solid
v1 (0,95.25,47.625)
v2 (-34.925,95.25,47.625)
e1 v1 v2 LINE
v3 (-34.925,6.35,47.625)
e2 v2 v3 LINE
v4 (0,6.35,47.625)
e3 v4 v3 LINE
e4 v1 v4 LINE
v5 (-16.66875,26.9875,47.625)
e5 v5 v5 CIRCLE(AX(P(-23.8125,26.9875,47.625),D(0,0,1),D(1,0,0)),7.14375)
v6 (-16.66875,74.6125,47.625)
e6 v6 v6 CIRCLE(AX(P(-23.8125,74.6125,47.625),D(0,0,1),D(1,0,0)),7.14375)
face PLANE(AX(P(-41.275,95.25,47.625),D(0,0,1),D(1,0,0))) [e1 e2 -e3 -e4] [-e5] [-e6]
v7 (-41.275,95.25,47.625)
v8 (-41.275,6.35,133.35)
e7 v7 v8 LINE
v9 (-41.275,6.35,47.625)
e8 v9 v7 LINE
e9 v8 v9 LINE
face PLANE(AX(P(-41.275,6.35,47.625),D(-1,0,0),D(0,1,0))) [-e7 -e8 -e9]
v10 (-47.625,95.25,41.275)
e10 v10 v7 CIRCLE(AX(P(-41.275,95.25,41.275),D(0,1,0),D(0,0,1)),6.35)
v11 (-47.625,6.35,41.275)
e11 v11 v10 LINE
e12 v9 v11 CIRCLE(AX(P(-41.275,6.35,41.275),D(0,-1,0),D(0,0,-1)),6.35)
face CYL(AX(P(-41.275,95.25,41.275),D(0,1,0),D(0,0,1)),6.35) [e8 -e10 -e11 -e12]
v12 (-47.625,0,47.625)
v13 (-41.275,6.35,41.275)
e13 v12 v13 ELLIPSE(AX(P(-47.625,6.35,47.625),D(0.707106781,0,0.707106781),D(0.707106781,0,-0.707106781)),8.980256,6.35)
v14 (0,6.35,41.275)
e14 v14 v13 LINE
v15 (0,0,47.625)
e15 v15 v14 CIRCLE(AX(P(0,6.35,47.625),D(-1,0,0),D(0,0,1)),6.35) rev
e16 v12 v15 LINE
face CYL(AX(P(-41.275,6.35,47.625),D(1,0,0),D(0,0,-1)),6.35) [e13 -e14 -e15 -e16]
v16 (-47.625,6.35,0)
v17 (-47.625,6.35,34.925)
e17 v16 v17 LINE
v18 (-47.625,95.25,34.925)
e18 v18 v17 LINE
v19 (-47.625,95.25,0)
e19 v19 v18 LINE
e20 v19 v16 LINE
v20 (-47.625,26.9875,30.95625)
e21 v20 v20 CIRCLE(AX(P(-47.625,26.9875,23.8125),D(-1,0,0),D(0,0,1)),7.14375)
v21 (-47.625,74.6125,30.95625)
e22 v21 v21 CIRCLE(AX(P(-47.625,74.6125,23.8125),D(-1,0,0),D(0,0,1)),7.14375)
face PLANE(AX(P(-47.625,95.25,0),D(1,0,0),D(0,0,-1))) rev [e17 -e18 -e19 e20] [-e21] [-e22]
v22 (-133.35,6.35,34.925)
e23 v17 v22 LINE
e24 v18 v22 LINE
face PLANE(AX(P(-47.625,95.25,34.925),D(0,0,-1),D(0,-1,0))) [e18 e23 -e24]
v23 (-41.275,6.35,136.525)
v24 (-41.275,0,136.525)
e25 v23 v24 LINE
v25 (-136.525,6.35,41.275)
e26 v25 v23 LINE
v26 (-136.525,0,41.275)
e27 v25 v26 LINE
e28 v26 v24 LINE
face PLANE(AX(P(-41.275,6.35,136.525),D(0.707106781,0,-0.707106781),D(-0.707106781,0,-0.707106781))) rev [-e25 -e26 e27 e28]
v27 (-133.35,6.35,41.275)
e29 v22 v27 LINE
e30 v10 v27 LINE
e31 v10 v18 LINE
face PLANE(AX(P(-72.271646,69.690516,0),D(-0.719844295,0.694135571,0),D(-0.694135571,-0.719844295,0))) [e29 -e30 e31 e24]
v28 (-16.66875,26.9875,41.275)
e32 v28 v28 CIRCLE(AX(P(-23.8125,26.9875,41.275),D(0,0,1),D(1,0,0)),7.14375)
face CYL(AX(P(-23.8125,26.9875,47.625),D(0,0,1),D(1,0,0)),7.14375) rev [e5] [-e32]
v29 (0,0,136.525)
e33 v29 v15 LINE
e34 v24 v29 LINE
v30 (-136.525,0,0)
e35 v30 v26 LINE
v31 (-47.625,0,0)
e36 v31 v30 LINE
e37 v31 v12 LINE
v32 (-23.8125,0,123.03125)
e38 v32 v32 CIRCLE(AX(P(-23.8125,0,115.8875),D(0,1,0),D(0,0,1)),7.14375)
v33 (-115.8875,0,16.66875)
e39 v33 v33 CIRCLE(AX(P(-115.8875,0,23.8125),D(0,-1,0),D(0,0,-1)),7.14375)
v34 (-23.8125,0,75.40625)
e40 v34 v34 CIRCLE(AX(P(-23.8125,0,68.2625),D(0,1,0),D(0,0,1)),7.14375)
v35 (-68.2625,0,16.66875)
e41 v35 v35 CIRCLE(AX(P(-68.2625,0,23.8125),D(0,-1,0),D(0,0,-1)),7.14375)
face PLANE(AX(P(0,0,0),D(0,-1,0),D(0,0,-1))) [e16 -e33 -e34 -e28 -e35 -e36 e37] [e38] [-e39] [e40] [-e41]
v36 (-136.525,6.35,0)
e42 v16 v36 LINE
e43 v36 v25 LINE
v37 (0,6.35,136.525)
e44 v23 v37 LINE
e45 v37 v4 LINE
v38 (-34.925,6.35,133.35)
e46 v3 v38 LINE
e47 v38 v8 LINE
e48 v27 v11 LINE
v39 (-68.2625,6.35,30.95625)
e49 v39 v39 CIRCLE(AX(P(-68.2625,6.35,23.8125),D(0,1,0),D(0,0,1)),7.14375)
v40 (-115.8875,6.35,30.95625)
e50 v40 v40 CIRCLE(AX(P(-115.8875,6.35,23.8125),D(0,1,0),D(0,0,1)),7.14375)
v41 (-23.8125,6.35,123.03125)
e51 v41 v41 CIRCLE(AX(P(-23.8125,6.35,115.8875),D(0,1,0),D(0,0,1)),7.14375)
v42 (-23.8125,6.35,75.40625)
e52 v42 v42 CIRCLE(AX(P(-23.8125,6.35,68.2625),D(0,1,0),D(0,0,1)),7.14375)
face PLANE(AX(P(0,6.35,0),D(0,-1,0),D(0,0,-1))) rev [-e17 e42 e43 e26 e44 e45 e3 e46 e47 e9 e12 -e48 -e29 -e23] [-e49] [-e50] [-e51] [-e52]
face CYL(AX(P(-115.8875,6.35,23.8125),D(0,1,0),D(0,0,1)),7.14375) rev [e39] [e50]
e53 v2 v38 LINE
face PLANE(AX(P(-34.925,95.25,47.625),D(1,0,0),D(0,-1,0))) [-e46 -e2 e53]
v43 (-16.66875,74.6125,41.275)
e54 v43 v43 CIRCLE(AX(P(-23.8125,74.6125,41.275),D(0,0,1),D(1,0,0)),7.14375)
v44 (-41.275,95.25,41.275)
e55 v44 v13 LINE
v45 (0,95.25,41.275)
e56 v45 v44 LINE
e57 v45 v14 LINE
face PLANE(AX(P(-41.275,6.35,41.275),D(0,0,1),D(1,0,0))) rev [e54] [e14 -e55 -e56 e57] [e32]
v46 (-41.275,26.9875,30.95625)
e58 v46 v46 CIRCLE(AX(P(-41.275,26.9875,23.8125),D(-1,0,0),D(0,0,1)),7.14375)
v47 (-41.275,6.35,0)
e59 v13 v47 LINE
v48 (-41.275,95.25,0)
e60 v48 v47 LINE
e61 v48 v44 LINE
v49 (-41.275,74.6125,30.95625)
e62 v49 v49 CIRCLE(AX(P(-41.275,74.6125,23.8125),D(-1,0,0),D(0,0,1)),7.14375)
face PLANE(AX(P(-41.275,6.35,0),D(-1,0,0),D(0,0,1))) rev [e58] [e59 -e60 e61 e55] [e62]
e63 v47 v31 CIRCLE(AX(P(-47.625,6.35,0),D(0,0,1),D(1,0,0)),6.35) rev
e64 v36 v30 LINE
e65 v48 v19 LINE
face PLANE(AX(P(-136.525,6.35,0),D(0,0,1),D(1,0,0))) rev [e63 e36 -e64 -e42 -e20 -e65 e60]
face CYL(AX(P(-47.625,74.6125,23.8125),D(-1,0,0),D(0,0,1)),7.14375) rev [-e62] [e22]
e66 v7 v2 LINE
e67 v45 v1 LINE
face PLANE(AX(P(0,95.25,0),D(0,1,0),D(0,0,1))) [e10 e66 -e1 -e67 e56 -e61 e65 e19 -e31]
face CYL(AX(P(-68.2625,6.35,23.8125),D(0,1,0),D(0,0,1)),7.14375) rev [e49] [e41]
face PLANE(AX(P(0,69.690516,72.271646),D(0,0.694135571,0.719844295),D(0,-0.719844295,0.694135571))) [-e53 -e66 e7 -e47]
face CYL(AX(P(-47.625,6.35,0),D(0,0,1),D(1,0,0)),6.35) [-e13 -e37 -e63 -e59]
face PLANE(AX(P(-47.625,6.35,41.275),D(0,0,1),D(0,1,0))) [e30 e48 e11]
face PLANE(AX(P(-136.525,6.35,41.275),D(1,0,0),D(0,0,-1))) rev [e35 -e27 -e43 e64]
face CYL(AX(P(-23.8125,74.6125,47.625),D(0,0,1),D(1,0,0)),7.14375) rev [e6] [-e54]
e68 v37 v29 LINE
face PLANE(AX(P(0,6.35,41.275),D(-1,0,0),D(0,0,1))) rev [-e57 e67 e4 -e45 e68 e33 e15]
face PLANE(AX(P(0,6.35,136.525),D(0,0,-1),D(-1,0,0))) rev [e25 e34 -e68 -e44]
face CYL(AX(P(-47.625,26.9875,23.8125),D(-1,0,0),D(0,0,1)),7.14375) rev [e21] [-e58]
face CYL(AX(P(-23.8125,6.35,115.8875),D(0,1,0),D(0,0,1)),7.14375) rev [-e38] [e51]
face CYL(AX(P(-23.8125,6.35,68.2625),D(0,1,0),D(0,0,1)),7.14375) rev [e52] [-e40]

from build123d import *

# Parameters (mm, degrees)
BASE_PLATE_DEPTH      = 6.35
SKETCH2_W             = 6.35
SKETCH2_H             = 47.625
UPPER_LEAF_DEPTH      = 88.9
LOFT1_START           = 34.925
LOFT1_DEPTH           = 6.35
SKETCH10_W            = 7.14375
SKETCH10_H            = 47.62505
SKETCH10_AT_POINT_2_W = 7.14375
SKETCH10_AT_POINT_2_H = 47.62505
SKETCH10_AT_POINT_3_W = 7.14375
SKETCH10_AT_POINT_3_H = 47.62505
SKETCH10_AT_POINT_4_W = 7.14375
SKETCH10_AT_POINT_4_H = 47.62505
FILLET1_R             = 6.35


# Read off the part's stored shape, not the designer's step: Loft1, Mirror1
with BuildPart() as part:
    # Sketch1 → Base Plate (new body)
    with BuildSketch(Plane(origin=(0, 0, 0), x_dir=(1, 0, 0), z_dir=(0, 1, 0))):
        Polygon((-136.525, 0), (-41.275, 0), (-41.275, -41.275), (0, -41.275), (0, -136.525), (-41.275, -136.525), (-136.525, -41.275), align=None)
    extrude(amount=BASE_PLATE_DEPTH)

    # Sketch2 → Upper Leaf (add)
    with BuildSketch(Plane(origin=(0, 6.35, 0), x_dir=(1, 0, 0), z_dir=(0, 1, 0))):
        with Locations((-44.45, -23.8125)):
            Rectangle(SKETCH2_W, SKETCH2_H)
    extrude(amount=UPPER_LEAF_DEPTH)

    # Loft1 outline → Loft1 (add)
    with BuildSketch(Plane.XY.offset(LOFT1_START)):
        Polygon((-47.625, 6.35), (-47.625, 95.25), (-133.35, 6.35), align=None)
    extrude(amount=LOFT1_DEPTH)

    # Sketch10 → 9/16 (0.5625) Diameter Hole1 (revolve, cut)
    with BuildSketch(Plane(origin=(-47.625, 74.6125, 23.8125), x_dir=(0, 0, 1), z_dir=(0, 1, 0))):
        with Locations((3.571875, 23.812525)):
            Rectangle(SKETCH10_W, SKETCH10_H)
    revolve(axis=Axis((-53.975, 74.6125, 23.8125), (1, 0, 0)), mode=Mode.SUBTRACT)

    # Sketch10 at point 2 (carried to point 2, square into its face) → 9/16 (0.5625) Diameter Hole1 at 2 (revolve, cut)
    with BuildSketch(Plane(origin=(-47.625, 26.9875, 23.8125), x_dir=(0, 0, 1), z_dir=(0, 1, 0))):
        with Locations((3.571875, 23.812525)):
            Rectangle(SKETCH10_AT_POINT_2_W, SKETCH10_AT_POINT_2_H)
    revolve(axis=Axis((-53.975, 26.9875, 23.8125), (1, 0, 0)), mode=Mode.SUBTRACT)

    # Sketch10 at point 3 (carried to point 3, square into its face) → 9/16 (0.5625) Diameter Hole1 at 3 (revolve, cut)
    with BuildSketch(Plane(origin=(-68.2625, 6.35, 23.8125), x_dir=(0, 0, 1), z_dir=(1, 0, 0))):
        with Locations((3.571875, 23.812525)):
            Rectangle(SKETCH10_AT_POINT_3_W, SKETCH10_AT_POINT_3_H)
    revolve(axis=Axis((-68.2625, 12.7, 23.8125), (0, -1, 0)), mode=Mode.SUBTRACT)

    # Sketch10 at point 4 (carried to point 4, square into its face) → 9/16 (0.5625) Diameter Hole1 at 4 (revolve, cut)
    with BuildSketch(Plane(origin=(-115.8875, 6.35, 23.8125), x_dir=(0, 0, 1), z_dir=(1, 0, 0))):
        with Locations((3.571875, 23.812525)):
            Rectangle(SKETCH10_AT_POINT_4_W, SKETCH10_AT_POINT_4_H)
    revolve(axis=Axis((-115.8875, 12.7, 23.8125), (0, -1, 0)), mode=Mode.SUBTRACT)

    # Mirror1
    split(bisect_by=Plane(origin=(0, 0, 0), x_dir=(-0.7071067811865476, 0, 0.7071067811865476), z_dir=(0.7071067811865477, 0, 0.7071067811865475)), keep=Keep.BOTTOM)

    # Mirror1 2: part across plane


with BuildPart() as part_1:
    add(part.part)
    add(part.part.mirror(Plane(origin=(0, 0, 0), x_dir=(-0.7071067811865476, 0, 0.7071067811865476), z_dir=(0.7071067811865477, 0, 0.7071067811865475))))

    # Fillet1
    fillet1_edges = [part_1.edges().sort_by_distance(p)[0] for p in [
        (-41.275, 0, 20.6375),
        (-20.6375, 0, 41.275),
        (-47.625, 50.8, 47.625),
    ]]
    fillet(fillet1_edges, radius=FILLET1_R - 0.0001)  # a hair under: the kernel refuses the full size


solid = part_1.part
